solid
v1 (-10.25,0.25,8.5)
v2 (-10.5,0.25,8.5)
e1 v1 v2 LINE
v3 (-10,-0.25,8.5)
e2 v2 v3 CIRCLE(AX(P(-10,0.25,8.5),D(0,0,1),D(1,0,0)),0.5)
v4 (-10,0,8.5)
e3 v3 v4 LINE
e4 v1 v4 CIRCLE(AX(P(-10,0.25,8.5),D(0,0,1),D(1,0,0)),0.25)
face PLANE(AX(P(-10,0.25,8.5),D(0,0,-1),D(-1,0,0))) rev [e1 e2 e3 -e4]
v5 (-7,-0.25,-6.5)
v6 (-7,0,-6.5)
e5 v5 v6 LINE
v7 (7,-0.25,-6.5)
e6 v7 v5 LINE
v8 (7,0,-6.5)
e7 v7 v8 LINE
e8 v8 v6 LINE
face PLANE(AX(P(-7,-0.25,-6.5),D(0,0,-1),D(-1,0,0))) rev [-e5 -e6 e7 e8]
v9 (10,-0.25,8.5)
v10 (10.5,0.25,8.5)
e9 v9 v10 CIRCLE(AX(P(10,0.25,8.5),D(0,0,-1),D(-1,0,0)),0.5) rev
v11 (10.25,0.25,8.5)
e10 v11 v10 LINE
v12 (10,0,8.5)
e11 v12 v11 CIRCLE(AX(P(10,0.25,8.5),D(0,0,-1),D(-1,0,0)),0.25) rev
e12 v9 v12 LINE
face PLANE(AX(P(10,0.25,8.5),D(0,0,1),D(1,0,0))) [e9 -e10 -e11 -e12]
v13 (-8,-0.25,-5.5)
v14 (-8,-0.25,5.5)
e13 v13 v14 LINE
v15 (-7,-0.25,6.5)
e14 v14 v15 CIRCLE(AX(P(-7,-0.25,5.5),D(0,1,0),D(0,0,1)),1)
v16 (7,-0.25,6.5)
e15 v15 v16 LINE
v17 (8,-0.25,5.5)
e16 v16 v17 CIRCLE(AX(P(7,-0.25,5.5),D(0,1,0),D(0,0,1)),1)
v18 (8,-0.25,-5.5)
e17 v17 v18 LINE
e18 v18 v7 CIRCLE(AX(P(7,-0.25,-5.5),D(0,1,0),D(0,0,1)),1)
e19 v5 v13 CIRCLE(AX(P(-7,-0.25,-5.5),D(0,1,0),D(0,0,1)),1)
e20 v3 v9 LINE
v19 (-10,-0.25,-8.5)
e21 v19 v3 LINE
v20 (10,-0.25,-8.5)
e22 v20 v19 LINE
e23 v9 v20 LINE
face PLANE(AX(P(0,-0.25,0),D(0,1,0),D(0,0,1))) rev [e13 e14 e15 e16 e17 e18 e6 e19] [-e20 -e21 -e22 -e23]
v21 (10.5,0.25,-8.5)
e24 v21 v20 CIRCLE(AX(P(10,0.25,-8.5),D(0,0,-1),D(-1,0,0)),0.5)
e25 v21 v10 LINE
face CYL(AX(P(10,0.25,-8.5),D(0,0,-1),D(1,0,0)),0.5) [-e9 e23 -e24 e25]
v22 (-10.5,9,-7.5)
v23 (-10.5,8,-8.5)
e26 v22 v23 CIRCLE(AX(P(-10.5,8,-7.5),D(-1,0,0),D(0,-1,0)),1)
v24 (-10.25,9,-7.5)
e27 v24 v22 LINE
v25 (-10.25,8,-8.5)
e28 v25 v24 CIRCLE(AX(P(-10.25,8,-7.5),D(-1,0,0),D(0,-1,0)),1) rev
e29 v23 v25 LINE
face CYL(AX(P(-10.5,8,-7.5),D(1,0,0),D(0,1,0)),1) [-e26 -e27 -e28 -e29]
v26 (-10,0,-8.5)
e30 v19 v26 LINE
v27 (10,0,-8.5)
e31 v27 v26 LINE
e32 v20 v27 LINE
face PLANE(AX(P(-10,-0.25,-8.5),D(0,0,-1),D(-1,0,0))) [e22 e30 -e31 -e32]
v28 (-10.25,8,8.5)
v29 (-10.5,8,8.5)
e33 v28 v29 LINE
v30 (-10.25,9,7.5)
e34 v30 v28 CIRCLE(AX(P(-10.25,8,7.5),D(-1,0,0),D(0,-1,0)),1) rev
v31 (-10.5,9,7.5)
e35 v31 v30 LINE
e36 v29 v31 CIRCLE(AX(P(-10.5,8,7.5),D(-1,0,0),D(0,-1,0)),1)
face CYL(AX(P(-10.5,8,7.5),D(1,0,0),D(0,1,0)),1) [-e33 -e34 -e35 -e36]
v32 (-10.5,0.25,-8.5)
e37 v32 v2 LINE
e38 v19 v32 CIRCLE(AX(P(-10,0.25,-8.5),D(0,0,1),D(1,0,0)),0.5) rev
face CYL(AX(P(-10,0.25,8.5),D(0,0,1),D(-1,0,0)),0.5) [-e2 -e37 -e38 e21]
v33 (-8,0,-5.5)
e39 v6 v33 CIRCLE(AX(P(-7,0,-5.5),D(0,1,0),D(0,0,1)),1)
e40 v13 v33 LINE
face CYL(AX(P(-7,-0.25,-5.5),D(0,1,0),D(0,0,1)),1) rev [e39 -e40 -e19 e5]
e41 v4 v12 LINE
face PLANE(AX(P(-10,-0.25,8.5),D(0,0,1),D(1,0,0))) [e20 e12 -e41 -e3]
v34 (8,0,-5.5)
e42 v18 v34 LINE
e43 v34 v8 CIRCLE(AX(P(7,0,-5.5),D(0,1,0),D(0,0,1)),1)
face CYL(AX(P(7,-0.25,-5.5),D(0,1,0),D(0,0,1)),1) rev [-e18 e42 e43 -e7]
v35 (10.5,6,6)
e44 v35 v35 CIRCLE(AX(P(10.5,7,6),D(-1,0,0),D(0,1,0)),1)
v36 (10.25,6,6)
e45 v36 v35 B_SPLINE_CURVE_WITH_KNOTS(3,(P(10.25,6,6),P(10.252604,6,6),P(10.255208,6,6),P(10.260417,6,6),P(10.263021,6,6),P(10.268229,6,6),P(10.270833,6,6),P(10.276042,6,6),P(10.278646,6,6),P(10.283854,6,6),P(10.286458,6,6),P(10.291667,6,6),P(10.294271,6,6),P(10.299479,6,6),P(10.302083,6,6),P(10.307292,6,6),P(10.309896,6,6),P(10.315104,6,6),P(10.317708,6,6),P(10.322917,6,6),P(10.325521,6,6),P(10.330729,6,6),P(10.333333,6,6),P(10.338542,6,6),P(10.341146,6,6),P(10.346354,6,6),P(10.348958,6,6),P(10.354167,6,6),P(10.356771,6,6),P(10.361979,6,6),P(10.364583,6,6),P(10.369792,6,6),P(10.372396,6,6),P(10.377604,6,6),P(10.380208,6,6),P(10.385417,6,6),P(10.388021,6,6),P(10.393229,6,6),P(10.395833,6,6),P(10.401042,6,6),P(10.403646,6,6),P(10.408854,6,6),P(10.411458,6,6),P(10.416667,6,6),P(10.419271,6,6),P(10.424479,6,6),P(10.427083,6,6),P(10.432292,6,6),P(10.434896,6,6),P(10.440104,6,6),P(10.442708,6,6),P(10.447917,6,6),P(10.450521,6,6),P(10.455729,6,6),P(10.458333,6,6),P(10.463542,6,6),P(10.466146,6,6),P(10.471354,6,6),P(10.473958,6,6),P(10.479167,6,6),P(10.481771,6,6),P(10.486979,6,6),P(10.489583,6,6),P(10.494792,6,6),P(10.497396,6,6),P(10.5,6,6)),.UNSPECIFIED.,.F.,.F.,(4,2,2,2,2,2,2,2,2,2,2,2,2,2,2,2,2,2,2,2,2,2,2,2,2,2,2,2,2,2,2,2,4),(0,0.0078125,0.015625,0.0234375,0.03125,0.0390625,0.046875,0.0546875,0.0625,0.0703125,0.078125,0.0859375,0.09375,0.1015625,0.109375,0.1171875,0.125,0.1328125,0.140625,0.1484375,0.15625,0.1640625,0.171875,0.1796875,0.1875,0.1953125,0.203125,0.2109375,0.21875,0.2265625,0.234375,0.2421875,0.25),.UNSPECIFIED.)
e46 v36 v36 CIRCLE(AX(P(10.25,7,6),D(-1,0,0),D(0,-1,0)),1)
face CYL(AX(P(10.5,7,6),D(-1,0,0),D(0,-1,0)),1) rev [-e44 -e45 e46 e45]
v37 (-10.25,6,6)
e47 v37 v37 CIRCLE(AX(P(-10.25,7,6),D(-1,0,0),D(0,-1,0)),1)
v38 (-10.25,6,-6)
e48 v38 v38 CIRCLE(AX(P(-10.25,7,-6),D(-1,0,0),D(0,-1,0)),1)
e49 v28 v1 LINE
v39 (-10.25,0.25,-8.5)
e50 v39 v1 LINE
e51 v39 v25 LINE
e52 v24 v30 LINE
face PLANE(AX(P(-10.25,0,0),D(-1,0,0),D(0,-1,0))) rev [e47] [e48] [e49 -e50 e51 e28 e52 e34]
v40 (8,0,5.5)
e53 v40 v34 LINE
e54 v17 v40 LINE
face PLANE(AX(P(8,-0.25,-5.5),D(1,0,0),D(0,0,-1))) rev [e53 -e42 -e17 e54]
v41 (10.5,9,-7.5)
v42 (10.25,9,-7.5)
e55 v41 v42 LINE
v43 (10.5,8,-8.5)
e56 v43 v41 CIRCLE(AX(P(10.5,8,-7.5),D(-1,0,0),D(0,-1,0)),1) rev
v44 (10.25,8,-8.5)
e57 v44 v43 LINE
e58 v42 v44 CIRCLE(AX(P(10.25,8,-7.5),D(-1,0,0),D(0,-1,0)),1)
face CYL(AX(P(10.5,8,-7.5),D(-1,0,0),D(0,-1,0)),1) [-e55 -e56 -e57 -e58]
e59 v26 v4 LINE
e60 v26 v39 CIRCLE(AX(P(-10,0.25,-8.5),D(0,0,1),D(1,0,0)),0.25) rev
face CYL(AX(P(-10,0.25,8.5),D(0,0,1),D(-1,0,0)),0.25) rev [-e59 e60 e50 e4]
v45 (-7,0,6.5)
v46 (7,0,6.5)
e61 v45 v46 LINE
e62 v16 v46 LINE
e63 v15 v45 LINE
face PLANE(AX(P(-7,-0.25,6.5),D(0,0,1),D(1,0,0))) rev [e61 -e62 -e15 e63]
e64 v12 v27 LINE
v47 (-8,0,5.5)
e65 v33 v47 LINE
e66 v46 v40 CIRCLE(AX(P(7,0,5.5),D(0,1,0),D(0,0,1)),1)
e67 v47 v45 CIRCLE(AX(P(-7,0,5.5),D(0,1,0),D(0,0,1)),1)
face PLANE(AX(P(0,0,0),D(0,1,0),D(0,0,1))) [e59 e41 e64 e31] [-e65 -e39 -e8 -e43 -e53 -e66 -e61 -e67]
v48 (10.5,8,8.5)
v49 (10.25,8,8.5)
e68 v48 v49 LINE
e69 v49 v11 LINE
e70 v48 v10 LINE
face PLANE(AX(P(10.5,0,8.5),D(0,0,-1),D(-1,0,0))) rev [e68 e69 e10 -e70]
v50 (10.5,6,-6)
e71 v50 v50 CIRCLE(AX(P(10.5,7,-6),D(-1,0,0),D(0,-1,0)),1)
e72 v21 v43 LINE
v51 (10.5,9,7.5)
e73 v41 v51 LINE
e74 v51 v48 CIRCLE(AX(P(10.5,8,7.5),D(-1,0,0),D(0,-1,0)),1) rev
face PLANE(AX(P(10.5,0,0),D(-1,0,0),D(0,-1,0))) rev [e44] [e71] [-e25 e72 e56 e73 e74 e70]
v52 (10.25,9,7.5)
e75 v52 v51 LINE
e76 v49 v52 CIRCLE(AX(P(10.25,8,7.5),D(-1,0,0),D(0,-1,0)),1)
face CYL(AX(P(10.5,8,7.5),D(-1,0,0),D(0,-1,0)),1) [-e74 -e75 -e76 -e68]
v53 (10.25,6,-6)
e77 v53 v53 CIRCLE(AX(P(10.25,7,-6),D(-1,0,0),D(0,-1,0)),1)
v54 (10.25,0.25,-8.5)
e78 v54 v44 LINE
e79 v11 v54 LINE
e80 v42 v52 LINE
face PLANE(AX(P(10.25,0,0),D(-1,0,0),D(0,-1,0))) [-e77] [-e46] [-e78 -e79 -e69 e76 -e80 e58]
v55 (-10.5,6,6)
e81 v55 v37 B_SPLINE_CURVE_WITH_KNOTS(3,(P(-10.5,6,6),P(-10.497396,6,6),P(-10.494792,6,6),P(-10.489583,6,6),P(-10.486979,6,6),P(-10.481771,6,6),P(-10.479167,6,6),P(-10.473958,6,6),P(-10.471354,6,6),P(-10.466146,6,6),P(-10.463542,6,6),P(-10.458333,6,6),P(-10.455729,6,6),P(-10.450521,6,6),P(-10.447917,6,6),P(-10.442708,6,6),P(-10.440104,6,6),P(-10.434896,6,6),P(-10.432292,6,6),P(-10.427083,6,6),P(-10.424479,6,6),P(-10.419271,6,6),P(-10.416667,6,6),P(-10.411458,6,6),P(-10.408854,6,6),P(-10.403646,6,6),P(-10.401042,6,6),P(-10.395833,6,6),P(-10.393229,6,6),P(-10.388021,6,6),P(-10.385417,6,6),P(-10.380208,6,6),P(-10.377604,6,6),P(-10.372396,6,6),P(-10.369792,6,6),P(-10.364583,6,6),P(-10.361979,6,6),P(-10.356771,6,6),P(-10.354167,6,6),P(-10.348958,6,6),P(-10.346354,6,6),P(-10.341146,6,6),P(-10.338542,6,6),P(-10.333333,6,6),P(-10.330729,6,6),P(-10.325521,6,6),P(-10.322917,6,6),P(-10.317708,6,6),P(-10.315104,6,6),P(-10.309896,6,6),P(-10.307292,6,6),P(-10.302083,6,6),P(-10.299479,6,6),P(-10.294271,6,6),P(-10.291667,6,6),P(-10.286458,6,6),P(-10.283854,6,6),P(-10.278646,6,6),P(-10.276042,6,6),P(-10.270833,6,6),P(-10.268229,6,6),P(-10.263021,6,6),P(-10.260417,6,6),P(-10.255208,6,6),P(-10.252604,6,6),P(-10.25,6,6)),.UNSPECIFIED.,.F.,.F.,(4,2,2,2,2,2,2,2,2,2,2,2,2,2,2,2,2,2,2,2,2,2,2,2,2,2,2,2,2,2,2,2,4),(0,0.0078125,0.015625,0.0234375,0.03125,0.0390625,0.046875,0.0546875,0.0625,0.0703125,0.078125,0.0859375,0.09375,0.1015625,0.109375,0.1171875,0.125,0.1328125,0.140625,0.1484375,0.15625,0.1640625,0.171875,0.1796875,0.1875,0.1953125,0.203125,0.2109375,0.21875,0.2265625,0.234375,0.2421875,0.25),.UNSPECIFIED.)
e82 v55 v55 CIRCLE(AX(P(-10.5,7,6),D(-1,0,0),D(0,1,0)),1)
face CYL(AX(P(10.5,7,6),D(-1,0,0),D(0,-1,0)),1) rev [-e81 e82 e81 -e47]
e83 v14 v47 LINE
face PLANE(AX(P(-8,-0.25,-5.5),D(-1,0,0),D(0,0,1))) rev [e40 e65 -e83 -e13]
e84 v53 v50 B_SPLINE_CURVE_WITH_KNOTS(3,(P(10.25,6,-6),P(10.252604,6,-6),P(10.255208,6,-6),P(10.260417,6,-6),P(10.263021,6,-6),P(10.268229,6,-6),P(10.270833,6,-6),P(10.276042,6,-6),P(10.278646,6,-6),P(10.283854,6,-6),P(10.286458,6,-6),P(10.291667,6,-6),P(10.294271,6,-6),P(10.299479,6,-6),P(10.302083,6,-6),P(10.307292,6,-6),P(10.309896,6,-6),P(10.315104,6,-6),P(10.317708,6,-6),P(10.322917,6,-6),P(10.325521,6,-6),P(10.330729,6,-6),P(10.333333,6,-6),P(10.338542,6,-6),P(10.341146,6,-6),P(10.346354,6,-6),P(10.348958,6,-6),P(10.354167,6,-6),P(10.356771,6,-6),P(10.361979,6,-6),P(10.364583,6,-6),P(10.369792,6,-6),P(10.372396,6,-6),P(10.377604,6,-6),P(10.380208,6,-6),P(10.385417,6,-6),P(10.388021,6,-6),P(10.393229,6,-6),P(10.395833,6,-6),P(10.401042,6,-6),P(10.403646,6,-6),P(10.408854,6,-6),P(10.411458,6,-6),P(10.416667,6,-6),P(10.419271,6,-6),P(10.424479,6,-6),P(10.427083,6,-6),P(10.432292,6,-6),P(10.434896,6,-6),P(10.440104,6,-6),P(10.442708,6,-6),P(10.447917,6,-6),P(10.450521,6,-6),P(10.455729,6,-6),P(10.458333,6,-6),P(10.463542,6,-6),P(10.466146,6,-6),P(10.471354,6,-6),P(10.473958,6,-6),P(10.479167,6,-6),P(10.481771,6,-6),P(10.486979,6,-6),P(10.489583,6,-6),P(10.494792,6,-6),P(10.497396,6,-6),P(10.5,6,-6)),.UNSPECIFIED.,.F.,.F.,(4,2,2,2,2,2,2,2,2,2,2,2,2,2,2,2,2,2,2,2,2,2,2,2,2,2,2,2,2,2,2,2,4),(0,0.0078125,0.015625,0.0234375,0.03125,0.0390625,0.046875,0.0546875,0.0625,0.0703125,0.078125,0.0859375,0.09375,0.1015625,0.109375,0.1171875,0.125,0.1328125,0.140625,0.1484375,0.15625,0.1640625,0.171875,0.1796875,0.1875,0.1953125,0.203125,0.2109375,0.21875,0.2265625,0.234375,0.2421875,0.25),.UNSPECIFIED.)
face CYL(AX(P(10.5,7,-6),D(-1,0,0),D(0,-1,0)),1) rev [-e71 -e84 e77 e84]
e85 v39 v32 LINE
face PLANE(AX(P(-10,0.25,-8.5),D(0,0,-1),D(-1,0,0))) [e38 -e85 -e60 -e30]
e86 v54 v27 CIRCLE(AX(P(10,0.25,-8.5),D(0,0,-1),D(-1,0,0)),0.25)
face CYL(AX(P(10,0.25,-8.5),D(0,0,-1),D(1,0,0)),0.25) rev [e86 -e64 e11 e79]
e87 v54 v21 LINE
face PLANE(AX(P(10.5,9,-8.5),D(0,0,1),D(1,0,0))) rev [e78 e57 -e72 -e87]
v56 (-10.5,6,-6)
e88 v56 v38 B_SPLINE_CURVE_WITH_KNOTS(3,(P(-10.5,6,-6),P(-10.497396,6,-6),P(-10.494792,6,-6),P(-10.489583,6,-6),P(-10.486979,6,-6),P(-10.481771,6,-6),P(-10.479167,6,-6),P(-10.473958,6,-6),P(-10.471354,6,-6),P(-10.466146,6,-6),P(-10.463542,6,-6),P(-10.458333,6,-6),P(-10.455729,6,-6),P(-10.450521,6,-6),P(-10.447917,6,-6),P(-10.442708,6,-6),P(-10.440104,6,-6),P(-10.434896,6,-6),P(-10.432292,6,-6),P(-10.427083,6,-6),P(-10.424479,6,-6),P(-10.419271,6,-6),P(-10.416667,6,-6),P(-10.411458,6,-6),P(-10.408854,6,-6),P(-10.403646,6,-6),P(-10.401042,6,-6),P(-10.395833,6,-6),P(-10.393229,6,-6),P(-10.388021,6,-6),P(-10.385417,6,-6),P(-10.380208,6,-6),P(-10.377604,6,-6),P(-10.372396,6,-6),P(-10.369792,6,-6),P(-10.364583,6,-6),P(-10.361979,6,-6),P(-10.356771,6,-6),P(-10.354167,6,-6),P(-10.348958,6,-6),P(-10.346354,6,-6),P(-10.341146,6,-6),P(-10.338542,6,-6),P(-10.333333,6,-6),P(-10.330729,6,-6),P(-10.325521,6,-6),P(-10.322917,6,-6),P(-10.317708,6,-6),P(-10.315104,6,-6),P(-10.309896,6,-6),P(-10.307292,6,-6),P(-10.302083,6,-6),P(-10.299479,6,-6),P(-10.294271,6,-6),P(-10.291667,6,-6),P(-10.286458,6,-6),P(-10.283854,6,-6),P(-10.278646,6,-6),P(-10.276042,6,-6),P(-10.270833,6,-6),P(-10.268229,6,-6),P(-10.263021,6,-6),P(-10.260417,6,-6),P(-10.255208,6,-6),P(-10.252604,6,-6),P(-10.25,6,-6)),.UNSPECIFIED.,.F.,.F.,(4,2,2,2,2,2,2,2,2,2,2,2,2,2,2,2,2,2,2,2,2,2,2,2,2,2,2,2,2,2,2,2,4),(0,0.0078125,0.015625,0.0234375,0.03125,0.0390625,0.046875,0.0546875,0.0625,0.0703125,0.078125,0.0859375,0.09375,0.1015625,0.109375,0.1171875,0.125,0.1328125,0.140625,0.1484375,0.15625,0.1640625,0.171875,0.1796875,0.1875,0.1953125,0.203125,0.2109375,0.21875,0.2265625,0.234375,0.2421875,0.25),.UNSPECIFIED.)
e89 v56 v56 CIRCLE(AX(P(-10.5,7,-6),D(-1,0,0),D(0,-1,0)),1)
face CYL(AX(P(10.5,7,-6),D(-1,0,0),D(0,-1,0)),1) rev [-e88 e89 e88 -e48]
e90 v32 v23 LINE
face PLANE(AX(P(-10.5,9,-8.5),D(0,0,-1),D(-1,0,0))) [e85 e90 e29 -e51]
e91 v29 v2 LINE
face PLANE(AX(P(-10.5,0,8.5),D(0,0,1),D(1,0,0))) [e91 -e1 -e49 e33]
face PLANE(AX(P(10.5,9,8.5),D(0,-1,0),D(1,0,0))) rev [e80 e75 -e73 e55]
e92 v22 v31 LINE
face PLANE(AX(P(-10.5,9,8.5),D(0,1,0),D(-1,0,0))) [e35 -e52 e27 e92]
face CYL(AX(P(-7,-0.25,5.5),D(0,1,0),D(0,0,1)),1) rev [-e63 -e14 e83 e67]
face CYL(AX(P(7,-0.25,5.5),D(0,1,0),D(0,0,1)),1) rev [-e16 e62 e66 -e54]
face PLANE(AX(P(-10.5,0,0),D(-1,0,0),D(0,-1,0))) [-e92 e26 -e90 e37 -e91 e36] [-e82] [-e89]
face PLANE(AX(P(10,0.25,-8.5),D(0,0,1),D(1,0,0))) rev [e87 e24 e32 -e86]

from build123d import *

# Parameters (mm, degrees)
SKETCH1_W          = 20
SKETCH1_H          = 17
BASE_FLANGE1_DEPTH = 0.25
CUT_EXTRUDE1_DEPTH = 14.126785593
EDGE_FLANGE2_DEPTH = 17
EDGE_FLANGE3_DEPTH = 17
FILLET1_R          = 1
SKETCH27_R         = 1
CUT_EXTRUDE2_DEPTH = 25.377243486


# Sheet-metal steps are written as plain solids
with BuildPart() as part:
    # Sketch1 → Base-Flange1 (new body)
    with BuildSketch(Plane(origin=(0, 0, 0), x_dir=(1, 0, 0), z_dir=(0, 1, 0))):
        Rectangle(SKETCH1_W, SKETCH1_H)
    extrude(amount=-BASE_FLANGE1_DEPTH)

    # Sketch6 → Cut-Extrude1 (cut, through all)
    with BuildSketch(Plane(origin=(0, 0, 0), x_dir=(1, 0, 0), z_dir=(0, 1, 0))):
        with BuildLine():
            Line((-7, 6.5), (7, 6.5))
            ThreePointArc((7, 6.5), (7.707106781, 6.207106781), (8, 5.5))
            Line((8, 5.5), (8, -5.5))
            ThreePointArc((8, -5.5), (7.707106781, -6.207106781), (7, -6.5))
            Line((7, -6.5), (-7, -6.5))
            ThreePointArc((-7, -6.5), (-7.707106781, -6.207106781), (-8, -5.5))
            Line((-8, -5.5), (-8, 5.5))
            ThreePointArc((-8, 5.5), (-7.707106781, 6.207106781), (-7, 6.5))
        make_face()
    extrude(amount=-CUT_EXTRUDE1_DEPTH, mode=Mode.SUBTRACT)

    # Edge-Flange2 section (across the edge) → Edge-Flange2 (add)
    with BuildSketch(Plane(origin=(10.25, 0, 8.5), x_dir=(-1, 0, 0), z_dir=(0, 0, -1))):
        with BuildLine():
            Line((-0.25, 0.25), (-0.25, 9))
            Line((-0.25, 9), (0, 9))
            Line((0, 9), (0, 0.25))
            ThreePointArc((0, 0.25), (0.073223305, 0.073223305), (0.25, 0))
            Line((0.25, 0), (0.25, -0.25))
            ThreePointArc((0.25, -0.25), (-0.103553391, -0.103553391), (-0.25, 0.25))
        make_face()
    extrude(amount=EDGE_FLANGE2_DEPTH)

    # Edge-Flange3 section (across the edge) → Edge-Flange3 (add)
    with BuildSketch(Plane(origin=(-10.25, 0, -8.5), x_dir=(1, 0, 0), z_dir=(0, 0, 1))):
        with BuildLine():
            Line((-0.25, 0.25), (-0.25, 9))
            Line((-0.25, 9), (0, 9))
            Line((0, 9), (0, 0.25))
            ThreePointArc((0, 0.25), (0.073223305, 0.073223305), (0.25, 0))
            Line((0.25, 0), (0.25, -0.25))
            ThreePointArc((0.25, -0.25), (-0.103553391, -0.103553391), (-0.25, 0.25))
        make_face()
    extrude(amount=EDGE_FLANGE3_DEPTH)

    # Fillet1
    fillet1_edges = [part.edges().sort_by_distance(p)[0] for p in [
        (10.375, 9, 8.5),
        (10.375, 9, -8.5),
        (-10.375, 9, -8.5),
        (-10.375, 9, 8.5),
    ]]
    fillet(fillet1_edges, radius=FILLET1_R)

    # Sketch27 → Cut-Extrude2 (cut, through all)
    with BuildSketch(Plane.ZY.offset(10.5)):
        with Locations(Location((-6, 7, 0), (0, 0, 270))):
            Circle(SKETCH27_R)
        with Locations(Location((6, 7, 0), (0, 0, 270))):
            Circle(SKETCH27_R)
    extrude(amount=-CUT_EXTRUDE2_DEPTH, mode=Mode.SUBTRACT)


solid = part.part
